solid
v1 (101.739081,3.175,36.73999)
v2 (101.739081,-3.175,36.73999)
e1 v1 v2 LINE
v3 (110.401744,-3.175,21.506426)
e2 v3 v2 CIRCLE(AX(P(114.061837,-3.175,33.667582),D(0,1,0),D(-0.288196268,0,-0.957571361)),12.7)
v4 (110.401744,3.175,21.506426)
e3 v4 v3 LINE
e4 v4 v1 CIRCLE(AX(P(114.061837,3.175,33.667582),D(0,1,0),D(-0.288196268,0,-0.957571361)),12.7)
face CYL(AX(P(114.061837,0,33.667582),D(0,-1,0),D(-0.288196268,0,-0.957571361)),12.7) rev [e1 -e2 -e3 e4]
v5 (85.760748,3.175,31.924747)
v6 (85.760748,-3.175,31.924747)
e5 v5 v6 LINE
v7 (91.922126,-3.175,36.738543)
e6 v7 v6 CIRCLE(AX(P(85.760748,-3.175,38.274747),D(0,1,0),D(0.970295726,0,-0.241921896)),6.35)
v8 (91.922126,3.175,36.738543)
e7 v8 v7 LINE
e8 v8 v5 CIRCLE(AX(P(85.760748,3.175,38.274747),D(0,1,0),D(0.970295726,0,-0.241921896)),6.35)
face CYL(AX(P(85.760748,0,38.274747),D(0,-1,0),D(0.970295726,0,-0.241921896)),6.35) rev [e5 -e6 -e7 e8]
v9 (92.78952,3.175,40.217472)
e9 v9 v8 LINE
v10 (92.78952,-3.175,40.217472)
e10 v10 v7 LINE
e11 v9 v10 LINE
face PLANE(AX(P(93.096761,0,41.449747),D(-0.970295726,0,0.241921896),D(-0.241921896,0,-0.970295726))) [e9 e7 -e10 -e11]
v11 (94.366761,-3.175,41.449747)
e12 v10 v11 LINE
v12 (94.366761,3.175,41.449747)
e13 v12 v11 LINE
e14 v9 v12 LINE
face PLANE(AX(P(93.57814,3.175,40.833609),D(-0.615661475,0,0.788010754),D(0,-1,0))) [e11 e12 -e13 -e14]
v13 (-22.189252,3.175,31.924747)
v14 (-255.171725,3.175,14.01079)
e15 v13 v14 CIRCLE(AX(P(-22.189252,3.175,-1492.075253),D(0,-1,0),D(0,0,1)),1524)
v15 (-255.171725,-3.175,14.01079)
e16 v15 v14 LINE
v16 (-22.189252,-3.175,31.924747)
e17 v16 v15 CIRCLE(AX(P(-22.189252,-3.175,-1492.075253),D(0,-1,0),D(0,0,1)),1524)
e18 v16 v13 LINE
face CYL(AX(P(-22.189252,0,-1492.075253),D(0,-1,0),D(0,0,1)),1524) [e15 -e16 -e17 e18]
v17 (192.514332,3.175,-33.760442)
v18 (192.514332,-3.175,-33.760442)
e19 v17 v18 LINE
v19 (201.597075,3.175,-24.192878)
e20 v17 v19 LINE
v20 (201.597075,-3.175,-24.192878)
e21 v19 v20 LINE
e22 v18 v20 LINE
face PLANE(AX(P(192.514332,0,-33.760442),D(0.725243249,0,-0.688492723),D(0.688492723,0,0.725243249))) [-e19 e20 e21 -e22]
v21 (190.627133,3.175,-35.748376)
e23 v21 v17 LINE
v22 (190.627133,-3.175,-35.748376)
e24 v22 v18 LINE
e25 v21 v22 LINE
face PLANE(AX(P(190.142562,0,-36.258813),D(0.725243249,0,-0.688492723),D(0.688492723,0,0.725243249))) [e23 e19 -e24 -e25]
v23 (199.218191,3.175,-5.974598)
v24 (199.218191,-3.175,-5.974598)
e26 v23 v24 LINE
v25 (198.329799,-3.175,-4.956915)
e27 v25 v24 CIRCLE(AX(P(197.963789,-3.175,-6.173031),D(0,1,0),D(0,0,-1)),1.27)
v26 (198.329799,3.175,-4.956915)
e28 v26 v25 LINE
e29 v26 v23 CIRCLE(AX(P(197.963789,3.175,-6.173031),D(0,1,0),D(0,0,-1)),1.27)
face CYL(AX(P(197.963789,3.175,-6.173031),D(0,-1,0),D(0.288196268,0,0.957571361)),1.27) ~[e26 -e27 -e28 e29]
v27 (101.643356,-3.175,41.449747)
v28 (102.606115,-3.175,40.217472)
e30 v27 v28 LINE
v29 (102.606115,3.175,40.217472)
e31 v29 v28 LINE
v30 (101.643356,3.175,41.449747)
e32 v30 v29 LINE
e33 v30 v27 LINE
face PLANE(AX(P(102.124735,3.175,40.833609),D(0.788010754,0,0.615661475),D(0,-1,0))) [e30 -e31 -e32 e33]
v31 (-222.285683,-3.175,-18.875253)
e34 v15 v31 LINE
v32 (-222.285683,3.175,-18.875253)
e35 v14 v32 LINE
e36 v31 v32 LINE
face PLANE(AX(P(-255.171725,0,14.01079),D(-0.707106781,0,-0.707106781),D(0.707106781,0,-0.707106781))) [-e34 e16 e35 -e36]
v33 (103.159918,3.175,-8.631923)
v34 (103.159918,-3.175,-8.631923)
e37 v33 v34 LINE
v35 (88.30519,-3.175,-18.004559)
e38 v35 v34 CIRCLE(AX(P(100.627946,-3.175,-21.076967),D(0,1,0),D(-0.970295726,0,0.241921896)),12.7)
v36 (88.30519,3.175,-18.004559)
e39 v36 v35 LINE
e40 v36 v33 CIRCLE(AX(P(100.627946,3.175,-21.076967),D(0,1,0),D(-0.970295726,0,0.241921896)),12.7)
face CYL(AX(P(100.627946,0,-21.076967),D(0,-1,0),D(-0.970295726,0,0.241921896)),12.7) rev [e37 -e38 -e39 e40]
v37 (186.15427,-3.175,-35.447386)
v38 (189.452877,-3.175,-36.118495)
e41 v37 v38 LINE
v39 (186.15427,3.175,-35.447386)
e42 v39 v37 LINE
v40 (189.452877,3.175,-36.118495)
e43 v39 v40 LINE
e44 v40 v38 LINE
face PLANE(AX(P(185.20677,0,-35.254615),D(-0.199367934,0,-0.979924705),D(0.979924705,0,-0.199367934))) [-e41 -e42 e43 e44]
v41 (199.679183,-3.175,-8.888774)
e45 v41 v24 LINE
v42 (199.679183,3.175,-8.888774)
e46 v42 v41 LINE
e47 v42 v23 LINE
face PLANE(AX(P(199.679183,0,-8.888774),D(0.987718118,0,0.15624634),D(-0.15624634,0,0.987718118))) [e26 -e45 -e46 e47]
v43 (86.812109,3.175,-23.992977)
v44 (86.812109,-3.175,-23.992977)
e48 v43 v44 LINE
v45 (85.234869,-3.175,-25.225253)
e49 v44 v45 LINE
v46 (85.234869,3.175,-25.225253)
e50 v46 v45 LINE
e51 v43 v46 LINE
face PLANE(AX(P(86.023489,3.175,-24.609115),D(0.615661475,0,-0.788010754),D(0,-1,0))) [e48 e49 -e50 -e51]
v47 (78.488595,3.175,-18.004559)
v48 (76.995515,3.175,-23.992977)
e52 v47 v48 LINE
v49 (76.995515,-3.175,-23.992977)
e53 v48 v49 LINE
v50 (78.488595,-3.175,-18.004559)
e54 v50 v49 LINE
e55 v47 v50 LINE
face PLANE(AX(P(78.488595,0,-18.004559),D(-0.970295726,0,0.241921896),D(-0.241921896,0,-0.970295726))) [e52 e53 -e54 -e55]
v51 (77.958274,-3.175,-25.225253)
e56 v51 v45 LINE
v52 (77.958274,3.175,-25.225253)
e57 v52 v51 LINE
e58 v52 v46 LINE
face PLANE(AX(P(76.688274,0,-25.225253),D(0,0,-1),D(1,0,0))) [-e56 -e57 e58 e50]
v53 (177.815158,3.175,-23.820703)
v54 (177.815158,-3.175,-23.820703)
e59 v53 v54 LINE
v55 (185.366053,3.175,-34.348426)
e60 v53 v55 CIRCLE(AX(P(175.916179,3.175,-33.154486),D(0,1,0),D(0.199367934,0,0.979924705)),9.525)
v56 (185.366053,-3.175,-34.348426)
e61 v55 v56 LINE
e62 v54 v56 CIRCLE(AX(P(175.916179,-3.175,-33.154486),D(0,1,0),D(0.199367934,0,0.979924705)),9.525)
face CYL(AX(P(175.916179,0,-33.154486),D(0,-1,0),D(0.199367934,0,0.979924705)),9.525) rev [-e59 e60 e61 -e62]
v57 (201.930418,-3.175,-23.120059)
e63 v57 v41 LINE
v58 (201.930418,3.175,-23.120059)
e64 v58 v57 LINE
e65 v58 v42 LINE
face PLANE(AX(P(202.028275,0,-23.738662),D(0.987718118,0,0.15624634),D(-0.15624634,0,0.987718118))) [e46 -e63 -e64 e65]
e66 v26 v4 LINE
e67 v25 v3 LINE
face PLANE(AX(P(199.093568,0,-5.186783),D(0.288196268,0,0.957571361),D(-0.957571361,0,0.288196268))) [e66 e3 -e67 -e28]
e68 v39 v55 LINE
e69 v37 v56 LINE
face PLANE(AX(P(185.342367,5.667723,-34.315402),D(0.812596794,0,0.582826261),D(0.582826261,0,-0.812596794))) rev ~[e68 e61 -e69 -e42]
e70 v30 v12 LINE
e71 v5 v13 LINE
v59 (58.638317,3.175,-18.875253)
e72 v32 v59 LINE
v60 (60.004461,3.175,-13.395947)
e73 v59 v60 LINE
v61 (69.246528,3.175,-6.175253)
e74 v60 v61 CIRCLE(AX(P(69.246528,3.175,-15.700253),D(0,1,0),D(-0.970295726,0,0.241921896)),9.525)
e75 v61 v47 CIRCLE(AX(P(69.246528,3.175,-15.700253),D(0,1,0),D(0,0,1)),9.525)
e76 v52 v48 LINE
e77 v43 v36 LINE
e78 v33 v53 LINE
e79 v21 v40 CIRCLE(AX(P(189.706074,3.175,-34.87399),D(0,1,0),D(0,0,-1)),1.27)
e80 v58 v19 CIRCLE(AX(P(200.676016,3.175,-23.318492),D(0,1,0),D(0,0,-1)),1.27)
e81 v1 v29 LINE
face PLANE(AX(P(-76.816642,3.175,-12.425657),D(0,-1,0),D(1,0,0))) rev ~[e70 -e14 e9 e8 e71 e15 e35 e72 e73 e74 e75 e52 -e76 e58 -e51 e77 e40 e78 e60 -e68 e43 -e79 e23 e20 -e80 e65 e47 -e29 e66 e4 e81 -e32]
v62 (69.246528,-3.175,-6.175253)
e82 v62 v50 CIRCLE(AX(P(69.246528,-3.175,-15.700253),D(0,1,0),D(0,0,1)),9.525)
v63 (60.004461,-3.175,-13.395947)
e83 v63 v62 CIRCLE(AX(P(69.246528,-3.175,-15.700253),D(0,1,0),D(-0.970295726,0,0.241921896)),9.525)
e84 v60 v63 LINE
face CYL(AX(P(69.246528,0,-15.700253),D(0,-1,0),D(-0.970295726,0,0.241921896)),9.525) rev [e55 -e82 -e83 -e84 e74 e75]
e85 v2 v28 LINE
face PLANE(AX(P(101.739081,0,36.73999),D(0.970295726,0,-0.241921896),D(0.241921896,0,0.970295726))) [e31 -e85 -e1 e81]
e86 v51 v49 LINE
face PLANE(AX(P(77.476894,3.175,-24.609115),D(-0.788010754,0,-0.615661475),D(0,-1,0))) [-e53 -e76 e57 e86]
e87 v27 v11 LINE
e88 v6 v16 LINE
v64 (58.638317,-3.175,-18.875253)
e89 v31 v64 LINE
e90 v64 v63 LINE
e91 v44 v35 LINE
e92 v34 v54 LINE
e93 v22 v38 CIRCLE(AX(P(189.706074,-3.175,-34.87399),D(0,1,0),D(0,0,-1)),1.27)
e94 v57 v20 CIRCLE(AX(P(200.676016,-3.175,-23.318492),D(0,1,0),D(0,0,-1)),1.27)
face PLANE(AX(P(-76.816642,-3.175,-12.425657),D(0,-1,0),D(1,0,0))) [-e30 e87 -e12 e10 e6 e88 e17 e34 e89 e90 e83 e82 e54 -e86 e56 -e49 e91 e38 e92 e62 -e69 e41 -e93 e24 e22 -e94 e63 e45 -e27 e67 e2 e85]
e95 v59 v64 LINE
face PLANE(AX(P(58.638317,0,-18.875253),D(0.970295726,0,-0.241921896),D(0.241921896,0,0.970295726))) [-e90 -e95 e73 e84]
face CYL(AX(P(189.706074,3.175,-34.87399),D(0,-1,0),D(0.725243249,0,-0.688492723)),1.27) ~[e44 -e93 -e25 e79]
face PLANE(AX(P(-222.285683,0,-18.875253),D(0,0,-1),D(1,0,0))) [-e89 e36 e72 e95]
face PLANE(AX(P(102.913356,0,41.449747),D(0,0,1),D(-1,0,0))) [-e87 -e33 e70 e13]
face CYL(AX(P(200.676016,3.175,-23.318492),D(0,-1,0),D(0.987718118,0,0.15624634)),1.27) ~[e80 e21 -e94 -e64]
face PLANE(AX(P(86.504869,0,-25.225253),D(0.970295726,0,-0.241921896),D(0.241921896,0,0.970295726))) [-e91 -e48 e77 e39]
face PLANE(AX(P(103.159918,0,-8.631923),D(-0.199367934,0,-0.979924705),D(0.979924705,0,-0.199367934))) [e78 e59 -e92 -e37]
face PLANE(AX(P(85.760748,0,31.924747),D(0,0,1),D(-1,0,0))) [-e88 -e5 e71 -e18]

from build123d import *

# Parameters (mm, degrees)
F1_DEPTH    = 3.175
F2_SIZE2    = 1.27
F2_SIZE     = 1.27
F3_SIZE     = 1.27
F4_T1_DEPTH = 11.3354455178
F5_R        = 1.27


# Not quite as in the source:
# - a fillet or chamfer that OpenCascade refuses, or shapes differently, is made with other operations: its cross-section is extruded or revolved along the edge and cut away or added


with BuildPart() as f1:
    # F0 (on Front) → F1 (new body, symmetric)
    with BuildSketch(Plane.XZ):
        with BuildLine():
            Line((-222.2856830398, -18.875252817), (58.6383169602, -18.875252817))
            Line((58.6383169602, -18.875252817), (60.004461396, -13.3959467614))
            ThreePointArc((60.004461396, -13.3959467614), (63.3823526363, -8.1944503889), (69.2465281888, -6.175252817))
            Line((69.2465281888, -6.175252817), (-217.0251707977, -6.175252817))
            Line((-217.0251707977, -6.175252817), (-222.2856830398, -18.875252817))
        make_face()
        Polygon((-255.1717254639, 14.010789607), (-222.2856830398, -18.875252817), (-217.0251707977, -6.175252817), (-238.4935903897, 15.293166775), align=None)
        with BuildLine():
            ThreePointArc((-22.1892522704, 31.924747183), (-139.0243312187, 27.4396580434), (-255.1717254639, 14.0107896071))
            Line((-255.1717254639, 14.0107896071), (-238.4935903897, 15.293166775))
            Line((-238.4935903897, 15.293166775), (-22.1892522704, 31.924747183))
        make_face()
        with BuildLine():
            Line((-238.4935903897, 15.293166775), (-217.0251707977, -6.175252817))
            Line((-217.0251707977, -6.175252817), (69.2465281888, -6.175252817))
            ThreePointArc((69.2465281888, -6.175252817), (76.7523306169, -9.8360772646), (78.4885949816, -18.0045588726))
            Line((78.4885949816, -18.0045588726), (76.6882737813, -25.225252817))
            Line((76.6882737813, -25.225252817), (86.5048686008, -25.225252817))
            Line((86.5048686008, -25.225252817), (88.3051898011, -18.0045588726))
            ThreePointArc((88.3051898011, -18.0045588726), (93.8510411727, -10.3362236111), (103.1599182919, -8.631923198))
            Line((103.1599182919, -8.631923198), (177.815158105, -23.8207034021))
            ThreePointArc((177.815158105, -23.8207034021), (183.9152537909, -27.983372217), (185.2067697838, -35.2546145785))
            Line((185.2067697838, -35.2546145785), (190.1425618478, -36.2588128234))
            Line((190.1425618478, -36.2588128234), (192.5143319625, -33.7604418083))
            Line((192.5143319625, -33.7604418083), (199.6791825839, -8.8887735704))
            Line((199.6791825839, -8.8887735704), (199.0935677301, -5.1867834867))
            Line((199.0935677301, -5.1867834867), (110.401744257, 21.506425589))
            ThreePointArc((110.401744257, 21.506425589), (103.0219894482, 27.389702526), (101.7390811386, 36.7399899454))
            Line((101.7390811386, 36.7399899454), (102.9133555046, 41.449747183))
            Line((102.9133555046, 41.449747183), (93.096760685, 41.449747183))
            Line((93.096760685, 41.449747183), (91.9221255914, 36.7385431459))
            ThreePointArc((91.9221255914, 36.7385431459), (89.6701980979, 33.2708788976), (85.7607477296, 31.924747183))
            Line((85.7607477296, 31.924747183), (-22.1892522704, 31.924747183))
            Line((-22.1892522704, 31.924747183), (-238.4935903897, 15.293166775))
        make_face()
        Polygon((202.0282745361, -23.738661781), (199.6791825839, -8.8887735704), (192.5143319625, -33.7604418083), align=None)
    extrude(amount=F1_DEPTH, both=True)

    # F2
    f2_edges = [f1.edges().sort_by_distance(p)[0] for p in [
        (93.096761, 0, 41.449747),
        (86.504869, 0, -25.225253),
    ]]
    chamfer(f2_edges, length=F2_SIZE, length2=F2_SIZE2)

    # F3
    f3_edges = [f1.edges().sort_by_distance(p)[0] for p in [
        (102.913356, 0, 41.449747),
        (76.688274, 0, -25.225253),
    ]]
    chamfer(f3_edges, length=F3_SIZE)

    # F4: chamfer of 1.016 on 1 edges, made by hand

    # F4_s2 → F4_t1 (cut)
    with BuildSketch(Plane.XZ.offset(-5.6677227589)):
        with BuildLine():
            Line((185.3423672188, -34.3154020779), (186.1779563064, -35.4804096602))
            Line((186.1779563064, -35.4804096602), (186.1739051499, -35.5003217302))
            ThreePointArc((186.1739051499, -35.5003217302), (185.6910670267, -35.3738822533), (185.2027186274, -35.2745266485))
            Line((185.2027186274, -35.2745266485), (185.1869498558, -35.2501343047))
            ThreePointArc((185.1869498558, -35.2501343047), (185.2797978886, -34.7859194498), (185.322207486, -34.3128550063))
            Line((185.322207486, -34.3128550063), (185.3423672188, -34.3154020779))
        make_face()
    extrude(amount=F4_T1_DEPTH, mode=Mode.SUBTRACT)

    # F5
    f5_edges = [f1.edges().sort_by_distance(p)[0] for p in [
        (202.028275, 0, -23.738662),
        (199.093568, 0, -5.186783),
        (190.142562, 0, -36.258813),
    ]]
    fillet(f5_edges, radius=F5_R)


solid = f1.part
